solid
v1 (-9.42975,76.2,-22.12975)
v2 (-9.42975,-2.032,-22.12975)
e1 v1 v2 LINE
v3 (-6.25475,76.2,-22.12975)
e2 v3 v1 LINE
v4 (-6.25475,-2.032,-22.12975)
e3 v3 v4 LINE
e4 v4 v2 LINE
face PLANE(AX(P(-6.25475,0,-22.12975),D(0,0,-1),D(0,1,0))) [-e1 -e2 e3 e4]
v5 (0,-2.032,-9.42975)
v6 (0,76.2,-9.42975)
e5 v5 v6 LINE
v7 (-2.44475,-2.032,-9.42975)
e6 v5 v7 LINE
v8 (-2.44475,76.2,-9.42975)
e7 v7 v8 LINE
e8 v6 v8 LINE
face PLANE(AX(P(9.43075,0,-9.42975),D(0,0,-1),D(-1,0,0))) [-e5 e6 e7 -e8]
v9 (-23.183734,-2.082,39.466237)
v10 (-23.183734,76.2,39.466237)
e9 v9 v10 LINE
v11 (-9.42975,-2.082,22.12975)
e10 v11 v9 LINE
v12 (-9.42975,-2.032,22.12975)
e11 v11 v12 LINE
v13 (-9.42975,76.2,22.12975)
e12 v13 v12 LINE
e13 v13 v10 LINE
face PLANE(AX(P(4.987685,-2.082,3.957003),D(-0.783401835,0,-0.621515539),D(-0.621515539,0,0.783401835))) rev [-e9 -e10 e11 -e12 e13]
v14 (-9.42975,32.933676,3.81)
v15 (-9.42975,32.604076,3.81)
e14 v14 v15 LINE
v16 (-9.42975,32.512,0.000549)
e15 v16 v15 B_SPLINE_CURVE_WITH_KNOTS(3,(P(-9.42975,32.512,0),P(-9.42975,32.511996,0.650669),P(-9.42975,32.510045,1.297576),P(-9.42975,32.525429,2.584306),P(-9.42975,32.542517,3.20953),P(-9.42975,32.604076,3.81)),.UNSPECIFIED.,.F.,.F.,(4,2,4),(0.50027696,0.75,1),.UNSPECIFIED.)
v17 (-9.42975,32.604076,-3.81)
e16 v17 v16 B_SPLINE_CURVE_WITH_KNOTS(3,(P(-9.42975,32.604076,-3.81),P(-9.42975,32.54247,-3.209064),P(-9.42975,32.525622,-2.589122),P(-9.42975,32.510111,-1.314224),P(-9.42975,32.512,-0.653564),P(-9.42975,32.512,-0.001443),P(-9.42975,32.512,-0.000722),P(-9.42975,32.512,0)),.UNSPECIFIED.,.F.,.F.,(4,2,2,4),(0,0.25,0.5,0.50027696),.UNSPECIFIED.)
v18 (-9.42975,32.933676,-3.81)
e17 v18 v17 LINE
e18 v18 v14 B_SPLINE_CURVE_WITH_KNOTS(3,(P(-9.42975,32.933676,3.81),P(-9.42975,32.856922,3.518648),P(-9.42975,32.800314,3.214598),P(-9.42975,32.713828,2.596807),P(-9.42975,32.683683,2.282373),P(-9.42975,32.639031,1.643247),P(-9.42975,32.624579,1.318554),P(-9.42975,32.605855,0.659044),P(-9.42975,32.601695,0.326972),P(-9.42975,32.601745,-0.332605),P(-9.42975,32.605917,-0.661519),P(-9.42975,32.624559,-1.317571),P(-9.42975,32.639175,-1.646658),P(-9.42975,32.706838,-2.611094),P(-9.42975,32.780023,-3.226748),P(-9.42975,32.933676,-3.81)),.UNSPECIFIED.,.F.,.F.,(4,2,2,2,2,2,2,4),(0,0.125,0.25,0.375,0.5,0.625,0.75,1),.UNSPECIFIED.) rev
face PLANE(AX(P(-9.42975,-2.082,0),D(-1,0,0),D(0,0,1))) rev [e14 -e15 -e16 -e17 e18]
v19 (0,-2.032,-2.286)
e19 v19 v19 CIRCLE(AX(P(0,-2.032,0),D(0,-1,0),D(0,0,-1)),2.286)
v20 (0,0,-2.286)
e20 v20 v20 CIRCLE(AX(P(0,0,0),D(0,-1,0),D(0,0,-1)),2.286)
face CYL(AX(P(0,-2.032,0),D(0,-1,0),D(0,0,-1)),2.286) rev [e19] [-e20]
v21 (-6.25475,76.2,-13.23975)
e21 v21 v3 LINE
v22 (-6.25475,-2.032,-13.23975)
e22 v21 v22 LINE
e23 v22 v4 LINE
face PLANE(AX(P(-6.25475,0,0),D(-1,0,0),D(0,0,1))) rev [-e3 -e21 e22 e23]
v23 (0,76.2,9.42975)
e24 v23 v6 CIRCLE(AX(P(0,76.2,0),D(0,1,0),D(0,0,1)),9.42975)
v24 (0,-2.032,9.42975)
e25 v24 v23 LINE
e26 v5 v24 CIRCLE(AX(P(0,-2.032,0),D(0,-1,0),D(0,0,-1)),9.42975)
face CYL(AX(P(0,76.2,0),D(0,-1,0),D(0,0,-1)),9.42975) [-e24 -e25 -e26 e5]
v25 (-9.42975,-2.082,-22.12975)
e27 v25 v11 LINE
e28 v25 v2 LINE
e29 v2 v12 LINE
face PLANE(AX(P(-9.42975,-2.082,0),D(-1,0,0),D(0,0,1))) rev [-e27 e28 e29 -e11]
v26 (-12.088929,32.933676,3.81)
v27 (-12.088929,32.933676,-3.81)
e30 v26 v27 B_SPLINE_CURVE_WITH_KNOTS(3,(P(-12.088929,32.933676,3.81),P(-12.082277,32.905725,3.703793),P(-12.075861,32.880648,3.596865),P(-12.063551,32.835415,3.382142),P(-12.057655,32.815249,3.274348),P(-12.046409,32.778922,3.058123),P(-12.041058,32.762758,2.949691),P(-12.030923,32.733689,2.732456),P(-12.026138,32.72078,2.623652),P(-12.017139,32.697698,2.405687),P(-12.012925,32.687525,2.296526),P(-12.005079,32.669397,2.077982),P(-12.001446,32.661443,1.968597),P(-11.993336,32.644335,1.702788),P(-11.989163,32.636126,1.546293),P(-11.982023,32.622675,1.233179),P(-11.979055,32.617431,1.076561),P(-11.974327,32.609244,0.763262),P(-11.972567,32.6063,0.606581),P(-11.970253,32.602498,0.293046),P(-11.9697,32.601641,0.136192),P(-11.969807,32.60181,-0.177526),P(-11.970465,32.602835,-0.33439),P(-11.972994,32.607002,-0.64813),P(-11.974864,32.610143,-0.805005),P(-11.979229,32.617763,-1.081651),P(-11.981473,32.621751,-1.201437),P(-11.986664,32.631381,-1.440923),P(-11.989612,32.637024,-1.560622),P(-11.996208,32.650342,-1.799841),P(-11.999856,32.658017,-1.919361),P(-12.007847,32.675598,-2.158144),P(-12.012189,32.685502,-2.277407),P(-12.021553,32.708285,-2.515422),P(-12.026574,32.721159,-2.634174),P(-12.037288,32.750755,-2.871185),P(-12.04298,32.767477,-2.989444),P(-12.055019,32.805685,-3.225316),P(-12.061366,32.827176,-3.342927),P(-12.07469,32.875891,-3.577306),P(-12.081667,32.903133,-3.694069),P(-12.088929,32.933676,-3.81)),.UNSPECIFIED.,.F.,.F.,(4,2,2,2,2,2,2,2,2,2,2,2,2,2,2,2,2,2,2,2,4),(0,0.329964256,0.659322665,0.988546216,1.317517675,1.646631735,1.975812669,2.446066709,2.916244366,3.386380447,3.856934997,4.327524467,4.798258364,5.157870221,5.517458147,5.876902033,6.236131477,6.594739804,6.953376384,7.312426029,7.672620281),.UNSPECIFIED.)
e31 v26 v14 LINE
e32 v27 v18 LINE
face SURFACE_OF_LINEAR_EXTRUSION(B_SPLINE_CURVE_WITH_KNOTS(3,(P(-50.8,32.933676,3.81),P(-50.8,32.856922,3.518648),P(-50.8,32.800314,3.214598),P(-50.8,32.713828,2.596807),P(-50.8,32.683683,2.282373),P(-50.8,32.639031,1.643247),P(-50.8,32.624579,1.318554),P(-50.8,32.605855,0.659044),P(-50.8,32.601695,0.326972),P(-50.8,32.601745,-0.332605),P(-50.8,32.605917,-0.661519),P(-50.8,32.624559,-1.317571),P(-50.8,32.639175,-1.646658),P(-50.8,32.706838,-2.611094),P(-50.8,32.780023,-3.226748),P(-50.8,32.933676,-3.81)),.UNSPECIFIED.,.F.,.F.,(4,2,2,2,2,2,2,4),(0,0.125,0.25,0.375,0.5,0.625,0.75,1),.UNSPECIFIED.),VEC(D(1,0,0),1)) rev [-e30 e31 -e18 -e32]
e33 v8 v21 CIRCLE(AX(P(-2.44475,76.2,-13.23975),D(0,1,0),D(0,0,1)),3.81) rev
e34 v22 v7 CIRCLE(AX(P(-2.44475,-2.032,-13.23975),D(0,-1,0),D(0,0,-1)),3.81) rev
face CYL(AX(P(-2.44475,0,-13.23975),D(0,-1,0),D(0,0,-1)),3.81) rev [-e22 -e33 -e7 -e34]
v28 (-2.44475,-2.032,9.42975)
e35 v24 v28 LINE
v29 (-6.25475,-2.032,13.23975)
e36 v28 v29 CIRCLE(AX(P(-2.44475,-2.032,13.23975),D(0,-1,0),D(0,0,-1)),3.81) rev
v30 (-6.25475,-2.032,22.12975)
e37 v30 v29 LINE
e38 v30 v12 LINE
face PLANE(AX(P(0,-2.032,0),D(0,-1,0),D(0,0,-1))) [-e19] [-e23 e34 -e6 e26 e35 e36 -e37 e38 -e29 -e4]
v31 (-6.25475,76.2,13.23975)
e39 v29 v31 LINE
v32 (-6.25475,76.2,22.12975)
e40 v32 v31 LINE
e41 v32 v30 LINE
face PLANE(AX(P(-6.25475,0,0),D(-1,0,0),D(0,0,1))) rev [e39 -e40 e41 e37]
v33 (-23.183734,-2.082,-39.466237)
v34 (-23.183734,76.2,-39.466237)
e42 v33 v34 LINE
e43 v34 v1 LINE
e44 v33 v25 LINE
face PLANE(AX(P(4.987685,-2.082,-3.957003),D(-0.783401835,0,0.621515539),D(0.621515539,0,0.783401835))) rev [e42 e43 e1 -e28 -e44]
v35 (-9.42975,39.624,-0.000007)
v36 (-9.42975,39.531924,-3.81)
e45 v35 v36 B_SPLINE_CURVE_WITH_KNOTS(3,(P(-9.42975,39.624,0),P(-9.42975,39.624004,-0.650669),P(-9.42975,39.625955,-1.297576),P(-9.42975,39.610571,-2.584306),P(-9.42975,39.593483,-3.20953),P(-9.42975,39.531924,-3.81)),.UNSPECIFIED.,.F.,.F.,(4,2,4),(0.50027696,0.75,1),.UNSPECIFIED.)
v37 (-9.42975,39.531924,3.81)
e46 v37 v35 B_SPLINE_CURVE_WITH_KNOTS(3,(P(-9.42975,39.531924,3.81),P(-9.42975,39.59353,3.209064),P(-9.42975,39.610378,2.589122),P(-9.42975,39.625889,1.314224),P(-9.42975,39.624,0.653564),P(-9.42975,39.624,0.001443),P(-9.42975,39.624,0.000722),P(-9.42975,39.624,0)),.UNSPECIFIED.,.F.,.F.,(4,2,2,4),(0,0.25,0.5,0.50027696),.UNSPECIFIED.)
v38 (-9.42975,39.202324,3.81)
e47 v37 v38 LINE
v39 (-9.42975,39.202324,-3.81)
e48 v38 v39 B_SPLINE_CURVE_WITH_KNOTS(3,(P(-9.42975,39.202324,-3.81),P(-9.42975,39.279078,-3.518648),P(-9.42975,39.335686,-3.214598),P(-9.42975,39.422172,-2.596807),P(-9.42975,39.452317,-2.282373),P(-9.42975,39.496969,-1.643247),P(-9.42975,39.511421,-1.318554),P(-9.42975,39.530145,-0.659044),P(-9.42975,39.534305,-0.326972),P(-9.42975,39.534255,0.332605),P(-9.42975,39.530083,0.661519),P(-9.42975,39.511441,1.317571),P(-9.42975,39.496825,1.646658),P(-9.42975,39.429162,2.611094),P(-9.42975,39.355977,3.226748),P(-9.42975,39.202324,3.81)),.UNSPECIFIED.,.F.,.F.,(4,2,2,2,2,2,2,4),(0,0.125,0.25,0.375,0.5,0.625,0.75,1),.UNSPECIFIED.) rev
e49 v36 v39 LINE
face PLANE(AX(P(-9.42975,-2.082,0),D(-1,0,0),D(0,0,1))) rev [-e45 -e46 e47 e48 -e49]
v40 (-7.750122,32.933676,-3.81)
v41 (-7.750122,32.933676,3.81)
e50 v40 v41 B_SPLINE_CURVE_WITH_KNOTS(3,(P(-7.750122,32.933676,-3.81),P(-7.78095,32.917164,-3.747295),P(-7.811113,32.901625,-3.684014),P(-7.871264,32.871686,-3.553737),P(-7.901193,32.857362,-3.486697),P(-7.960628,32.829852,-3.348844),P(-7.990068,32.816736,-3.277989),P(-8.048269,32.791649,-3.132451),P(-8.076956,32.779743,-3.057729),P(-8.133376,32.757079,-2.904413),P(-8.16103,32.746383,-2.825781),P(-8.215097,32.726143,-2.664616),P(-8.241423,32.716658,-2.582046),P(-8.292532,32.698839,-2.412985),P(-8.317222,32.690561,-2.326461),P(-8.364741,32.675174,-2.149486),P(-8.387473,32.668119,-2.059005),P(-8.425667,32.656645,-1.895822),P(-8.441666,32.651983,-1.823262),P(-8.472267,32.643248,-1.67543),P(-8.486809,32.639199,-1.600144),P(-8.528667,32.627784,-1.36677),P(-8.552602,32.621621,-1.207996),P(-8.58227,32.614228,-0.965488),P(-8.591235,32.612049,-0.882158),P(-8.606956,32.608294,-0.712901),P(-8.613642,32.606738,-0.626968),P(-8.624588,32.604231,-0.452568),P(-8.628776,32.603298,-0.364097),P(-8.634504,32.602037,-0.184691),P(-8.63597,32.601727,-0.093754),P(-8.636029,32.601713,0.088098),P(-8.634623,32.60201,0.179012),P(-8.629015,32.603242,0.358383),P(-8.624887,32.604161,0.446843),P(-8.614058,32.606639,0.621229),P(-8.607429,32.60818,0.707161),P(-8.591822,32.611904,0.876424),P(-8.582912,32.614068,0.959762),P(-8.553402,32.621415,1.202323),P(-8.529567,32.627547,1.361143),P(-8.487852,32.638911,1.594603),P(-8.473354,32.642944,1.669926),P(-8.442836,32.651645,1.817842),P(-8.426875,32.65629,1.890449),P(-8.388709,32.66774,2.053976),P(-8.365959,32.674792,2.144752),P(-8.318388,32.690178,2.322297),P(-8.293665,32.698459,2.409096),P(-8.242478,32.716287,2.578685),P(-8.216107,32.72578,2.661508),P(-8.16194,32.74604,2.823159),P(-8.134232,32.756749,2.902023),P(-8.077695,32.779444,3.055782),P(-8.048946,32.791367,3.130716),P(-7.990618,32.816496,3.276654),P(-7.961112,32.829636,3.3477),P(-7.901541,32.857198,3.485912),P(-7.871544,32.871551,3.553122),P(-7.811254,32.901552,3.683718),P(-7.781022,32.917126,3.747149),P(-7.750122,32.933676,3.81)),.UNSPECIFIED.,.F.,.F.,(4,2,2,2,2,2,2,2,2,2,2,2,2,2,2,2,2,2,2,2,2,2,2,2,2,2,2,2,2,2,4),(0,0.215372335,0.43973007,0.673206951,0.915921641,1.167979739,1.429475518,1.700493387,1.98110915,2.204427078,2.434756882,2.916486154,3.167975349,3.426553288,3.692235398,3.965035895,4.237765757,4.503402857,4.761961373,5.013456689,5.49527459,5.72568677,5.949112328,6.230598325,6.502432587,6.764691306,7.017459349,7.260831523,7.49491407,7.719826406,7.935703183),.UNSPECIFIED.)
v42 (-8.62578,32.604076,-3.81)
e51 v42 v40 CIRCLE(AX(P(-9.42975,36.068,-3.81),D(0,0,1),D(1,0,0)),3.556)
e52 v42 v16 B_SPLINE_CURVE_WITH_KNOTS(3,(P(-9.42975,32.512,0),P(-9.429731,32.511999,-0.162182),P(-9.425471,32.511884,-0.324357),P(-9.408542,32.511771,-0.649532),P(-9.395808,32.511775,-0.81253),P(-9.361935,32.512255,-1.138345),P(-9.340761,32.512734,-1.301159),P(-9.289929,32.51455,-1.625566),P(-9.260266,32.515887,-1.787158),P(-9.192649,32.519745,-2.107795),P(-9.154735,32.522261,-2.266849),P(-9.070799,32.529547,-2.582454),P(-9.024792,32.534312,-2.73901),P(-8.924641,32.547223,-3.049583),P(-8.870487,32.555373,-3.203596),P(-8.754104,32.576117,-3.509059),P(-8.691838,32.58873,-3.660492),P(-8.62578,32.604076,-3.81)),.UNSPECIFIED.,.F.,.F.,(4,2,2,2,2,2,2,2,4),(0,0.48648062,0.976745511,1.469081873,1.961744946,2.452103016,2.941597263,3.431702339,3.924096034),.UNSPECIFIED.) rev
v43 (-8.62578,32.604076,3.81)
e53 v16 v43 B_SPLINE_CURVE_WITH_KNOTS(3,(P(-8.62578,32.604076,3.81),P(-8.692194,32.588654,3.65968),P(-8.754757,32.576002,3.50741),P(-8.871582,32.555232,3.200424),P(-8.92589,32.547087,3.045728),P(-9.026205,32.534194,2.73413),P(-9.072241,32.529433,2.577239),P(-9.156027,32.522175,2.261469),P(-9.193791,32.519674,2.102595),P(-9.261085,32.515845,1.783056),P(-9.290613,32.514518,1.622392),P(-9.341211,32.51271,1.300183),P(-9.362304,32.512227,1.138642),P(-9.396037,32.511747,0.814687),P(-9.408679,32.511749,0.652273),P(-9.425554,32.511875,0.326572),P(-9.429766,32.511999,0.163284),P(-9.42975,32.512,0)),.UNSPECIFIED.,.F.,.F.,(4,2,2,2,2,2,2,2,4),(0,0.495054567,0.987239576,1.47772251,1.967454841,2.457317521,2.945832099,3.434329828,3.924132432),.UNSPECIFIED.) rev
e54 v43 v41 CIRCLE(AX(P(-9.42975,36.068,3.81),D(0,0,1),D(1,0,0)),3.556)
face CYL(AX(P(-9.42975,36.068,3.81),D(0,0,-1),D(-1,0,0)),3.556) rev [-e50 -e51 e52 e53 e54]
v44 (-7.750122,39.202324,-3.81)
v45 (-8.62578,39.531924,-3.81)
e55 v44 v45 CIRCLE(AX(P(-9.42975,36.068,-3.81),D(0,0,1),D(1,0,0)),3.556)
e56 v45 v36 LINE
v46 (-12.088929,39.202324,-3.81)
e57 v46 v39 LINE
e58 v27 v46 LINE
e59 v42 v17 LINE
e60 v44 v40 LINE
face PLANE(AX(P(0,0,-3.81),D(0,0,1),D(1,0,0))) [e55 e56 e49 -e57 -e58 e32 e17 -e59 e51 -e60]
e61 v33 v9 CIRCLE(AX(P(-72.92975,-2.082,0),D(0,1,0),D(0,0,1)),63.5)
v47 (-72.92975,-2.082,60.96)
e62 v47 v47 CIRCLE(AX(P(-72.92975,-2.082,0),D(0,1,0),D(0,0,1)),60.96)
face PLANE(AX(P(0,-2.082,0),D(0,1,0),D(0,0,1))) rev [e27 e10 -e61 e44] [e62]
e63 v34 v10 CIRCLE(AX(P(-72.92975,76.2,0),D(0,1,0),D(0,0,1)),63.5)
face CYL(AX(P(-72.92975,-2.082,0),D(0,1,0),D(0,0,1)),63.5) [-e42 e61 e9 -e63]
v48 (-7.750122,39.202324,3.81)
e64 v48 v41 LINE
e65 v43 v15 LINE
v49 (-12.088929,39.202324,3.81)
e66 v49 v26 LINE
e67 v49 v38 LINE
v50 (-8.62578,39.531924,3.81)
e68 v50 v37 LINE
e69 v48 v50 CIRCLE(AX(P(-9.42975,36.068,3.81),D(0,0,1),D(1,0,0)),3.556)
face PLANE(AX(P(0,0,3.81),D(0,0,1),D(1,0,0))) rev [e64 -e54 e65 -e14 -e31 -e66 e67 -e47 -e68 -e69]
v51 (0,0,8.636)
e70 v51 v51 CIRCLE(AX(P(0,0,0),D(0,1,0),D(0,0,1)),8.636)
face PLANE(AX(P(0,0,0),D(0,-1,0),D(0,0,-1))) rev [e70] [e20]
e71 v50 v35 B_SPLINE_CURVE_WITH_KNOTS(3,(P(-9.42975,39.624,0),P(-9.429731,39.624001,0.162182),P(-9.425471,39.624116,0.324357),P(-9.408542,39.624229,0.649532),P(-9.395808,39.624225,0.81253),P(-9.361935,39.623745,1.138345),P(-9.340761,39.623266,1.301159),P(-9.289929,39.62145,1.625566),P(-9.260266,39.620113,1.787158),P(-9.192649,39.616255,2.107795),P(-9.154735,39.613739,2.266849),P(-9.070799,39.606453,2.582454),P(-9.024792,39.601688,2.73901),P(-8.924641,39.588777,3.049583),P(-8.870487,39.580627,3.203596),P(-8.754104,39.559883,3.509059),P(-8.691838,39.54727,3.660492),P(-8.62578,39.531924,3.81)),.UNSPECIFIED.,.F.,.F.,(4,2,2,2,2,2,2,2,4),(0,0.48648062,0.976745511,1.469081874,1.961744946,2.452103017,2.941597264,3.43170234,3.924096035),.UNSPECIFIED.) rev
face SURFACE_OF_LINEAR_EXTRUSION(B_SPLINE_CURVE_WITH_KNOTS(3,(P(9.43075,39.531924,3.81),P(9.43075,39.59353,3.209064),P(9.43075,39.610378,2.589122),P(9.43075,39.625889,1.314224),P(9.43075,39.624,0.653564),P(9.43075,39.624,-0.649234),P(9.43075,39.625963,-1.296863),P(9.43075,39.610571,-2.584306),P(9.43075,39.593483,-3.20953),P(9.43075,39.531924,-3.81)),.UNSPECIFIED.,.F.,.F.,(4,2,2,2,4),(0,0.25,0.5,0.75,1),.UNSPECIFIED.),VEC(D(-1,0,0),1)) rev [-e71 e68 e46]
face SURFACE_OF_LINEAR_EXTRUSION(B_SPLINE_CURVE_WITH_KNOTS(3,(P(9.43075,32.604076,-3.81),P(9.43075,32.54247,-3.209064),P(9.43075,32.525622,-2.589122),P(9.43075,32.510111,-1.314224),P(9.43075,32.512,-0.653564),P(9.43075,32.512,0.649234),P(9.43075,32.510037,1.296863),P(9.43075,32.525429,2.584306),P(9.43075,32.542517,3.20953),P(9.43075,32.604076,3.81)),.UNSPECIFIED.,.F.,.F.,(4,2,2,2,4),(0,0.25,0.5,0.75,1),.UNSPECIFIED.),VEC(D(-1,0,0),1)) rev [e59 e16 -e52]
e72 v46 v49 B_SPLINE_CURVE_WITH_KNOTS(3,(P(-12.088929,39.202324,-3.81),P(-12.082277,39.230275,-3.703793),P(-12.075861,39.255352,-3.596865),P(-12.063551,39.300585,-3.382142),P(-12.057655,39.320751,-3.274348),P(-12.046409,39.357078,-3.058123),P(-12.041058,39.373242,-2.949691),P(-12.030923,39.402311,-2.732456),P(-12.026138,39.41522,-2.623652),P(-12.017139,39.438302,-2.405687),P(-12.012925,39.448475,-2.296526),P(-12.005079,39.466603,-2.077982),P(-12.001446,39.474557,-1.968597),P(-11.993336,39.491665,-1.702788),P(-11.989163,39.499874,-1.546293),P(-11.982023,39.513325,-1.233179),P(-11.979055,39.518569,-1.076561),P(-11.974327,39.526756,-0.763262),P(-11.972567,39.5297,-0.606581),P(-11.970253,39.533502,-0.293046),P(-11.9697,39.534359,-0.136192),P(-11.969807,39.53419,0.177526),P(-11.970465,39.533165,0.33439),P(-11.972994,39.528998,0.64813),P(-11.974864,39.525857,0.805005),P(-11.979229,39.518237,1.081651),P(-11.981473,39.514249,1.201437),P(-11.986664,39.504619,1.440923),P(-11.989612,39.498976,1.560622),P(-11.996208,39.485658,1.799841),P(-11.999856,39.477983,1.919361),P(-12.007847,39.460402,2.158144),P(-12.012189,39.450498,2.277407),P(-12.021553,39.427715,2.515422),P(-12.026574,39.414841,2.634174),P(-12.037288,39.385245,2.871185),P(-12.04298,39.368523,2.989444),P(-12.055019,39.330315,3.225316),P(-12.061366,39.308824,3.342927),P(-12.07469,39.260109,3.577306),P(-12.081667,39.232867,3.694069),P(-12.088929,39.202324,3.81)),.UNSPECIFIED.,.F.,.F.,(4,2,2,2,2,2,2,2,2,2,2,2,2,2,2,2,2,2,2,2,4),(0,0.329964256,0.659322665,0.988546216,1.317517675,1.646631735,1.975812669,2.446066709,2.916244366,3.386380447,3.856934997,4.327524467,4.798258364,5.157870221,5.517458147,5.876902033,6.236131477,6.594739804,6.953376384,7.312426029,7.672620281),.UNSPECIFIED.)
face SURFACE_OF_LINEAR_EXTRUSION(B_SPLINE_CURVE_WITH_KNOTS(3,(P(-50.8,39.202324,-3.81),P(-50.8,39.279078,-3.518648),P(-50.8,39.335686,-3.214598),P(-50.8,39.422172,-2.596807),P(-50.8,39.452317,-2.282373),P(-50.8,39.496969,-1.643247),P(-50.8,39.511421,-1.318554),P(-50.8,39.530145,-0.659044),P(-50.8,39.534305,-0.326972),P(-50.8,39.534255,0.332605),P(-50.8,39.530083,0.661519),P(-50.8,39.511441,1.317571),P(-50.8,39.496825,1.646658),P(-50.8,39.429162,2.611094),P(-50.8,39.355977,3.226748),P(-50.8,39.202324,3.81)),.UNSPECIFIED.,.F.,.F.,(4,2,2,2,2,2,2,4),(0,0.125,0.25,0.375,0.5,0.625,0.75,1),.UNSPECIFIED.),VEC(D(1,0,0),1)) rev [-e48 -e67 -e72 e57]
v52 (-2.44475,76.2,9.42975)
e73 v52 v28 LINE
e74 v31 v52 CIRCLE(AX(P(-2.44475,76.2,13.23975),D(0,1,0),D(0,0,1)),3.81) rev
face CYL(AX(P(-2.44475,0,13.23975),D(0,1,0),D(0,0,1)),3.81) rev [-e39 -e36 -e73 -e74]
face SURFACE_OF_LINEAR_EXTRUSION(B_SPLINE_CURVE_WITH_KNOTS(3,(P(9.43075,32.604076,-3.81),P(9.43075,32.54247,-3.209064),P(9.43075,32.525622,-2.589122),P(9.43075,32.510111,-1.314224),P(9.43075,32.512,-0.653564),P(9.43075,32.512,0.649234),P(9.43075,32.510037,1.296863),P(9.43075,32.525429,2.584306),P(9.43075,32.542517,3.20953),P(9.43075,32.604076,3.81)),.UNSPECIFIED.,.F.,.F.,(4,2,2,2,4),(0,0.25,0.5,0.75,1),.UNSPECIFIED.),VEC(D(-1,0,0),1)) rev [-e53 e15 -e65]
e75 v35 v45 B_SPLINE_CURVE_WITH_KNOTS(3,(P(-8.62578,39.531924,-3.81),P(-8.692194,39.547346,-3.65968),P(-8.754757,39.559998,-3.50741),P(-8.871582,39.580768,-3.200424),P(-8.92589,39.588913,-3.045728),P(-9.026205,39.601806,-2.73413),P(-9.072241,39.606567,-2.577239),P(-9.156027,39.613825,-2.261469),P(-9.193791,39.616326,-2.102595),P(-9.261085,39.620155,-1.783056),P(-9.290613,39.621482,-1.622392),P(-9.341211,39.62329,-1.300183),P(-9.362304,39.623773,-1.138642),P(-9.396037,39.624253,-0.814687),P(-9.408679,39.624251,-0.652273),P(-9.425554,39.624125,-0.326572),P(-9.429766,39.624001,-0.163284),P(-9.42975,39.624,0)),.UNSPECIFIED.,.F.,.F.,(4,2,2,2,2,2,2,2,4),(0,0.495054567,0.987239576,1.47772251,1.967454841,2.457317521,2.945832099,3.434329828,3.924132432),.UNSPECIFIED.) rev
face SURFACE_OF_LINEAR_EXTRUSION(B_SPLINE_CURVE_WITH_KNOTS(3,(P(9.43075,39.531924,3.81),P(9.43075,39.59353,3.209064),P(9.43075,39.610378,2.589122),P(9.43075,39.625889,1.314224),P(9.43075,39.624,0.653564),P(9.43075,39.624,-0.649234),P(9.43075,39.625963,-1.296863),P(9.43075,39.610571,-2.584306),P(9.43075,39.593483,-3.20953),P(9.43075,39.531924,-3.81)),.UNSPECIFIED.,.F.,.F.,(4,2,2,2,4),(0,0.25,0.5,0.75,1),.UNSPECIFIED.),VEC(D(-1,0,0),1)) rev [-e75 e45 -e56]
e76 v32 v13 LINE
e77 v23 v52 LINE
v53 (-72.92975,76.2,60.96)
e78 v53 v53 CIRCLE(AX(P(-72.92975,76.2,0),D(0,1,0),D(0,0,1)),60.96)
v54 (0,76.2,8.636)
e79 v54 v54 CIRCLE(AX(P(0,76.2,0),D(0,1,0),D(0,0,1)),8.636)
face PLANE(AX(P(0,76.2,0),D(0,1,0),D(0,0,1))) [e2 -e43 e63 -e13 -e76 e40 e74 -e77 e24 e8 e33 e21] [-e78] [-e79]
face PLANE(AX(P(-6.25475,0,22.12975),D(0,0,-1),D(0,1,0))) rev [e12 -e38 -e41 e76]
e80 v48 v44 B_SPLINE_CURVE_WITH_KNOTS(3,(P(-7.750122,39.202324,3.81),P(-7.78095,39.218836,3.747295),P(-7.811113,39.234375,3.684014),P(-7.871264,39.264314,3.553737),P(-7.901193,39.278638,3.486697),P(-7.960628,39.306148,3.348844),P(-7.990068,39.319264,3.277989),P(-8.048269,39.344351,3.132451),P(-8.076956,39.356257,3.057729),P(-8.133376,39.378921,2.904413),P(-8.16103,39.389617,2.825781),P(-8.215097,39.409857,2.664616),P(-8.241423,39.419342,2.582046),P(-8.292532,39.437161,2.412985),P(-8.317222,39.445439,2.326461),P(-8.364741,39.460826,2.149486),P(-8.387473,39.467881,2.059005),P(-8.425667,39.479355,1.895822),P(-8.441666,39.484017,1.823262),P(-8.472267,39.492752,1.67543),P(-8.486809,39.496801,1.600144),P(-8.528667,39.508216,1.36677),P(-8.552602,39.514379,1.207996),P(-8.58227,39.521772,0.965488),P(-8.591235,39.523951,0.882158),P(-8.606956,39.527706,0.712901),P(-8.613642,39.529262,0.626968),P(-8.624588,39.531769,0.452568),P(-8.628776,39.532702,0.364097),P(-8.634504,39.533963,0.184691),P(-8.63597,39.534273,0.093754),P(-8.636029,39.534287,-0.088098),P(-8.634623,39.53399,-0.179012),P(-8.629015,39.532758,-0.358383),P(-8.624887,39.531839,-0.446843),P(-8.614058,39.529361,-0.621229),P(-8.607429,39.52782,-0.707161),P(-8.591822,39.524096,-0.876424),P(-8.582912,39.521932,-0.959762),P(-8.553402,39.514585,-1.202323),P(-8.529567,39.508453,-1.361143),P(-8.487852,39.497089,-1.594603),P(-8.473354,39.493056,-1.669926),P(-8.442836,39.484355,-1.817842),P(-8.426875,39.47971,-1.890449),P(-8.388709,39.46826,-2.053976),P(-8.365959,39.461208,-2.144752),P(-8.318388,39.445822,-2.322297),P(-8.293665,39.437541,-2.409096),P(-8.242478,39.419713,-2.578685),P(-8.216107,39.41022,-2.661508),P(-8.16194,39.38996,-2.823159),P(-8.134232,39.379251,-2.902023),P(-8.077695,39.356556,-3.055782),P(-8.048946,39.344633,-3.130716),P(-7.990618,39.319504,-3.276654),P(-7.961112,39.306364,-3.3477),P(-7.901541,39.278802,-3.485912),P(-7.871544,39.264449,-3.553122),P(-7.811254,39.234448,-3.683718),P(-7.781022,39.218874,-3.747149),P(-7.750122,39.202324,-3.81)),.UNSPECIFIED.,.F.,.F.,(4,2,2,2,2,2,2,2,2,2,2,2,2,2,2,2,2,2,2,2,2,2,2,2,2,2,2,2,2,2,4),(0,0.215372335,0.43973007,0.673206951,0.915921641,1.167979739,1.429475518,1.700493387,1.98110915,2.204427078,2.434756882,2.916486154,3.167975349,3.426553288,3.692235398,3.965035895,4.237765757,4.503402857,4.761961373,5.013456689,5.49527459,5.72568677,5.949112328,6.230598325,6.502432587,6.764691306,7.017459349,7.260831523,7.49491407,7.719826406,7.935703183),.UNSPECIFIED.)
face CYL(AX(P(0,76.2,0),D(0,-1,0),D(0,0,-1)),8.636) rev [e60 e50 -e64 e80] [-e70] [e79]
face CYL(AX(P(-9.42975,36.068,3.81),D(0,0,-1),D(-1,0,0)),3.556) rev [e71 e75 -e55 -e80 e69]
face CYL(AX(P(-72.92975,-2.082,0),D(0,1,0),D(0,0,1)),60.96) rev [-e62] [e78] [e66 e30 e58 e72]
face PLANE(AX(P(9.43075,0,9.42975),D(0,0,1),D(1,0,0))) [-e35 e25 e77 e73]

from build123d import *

# Parameters (mm, degrees)
SKETCH1_R                        = 9.42975
SKETCH1_R_2                      = 8.636
BOSS_EXTRUDE1_DEPTH              = 76.2
BOSS_EXTRUDE2_START              = 2.032
SKETCH2_R                        = 9.42975
BOSS_EXTRUDE2_DEPTH              = 2.032
F_10_0_1935_DIAMETER_HOLE1_D     = 4.572
F_10_0_1935_DIAMETER_HOLE1_DEPTH = 6.35
F_10_0_1935_DIAMETER_HOLE1_TIP   = 1.373567375
CUT_EXTRUDE1_DEPTH               = 3.81
CUT_EXTRUDE1_DEPTH_BACK          = 3.81
BOSS_EXTRUDE7_REACH              = 81.064
SKETCH7_W                        = 18.8595
SKETCH7_H                        = 78.232
SKETCH7_10_W                     = 12.7
SKETCH7_10_H                     = 78.232
BOSS_EXTRUDE8_DEPTH              = 3.175
FILLET1_R                        = 3.81
BOSS_EXTRUDE9_START              = -78.282
BOSS_EXTRUDE9_OUTLINE_R          = 60.96
BOSS_EXTRUDE9_DEPTH              = 78.282
CUT_EXTRUDE5_START               = -12.0889291
CUT_EXTRUDE5_DEPTH               = 2.6591791


# Read off the part's stored shape, not the designer's step: Boss-Extrude9, Cut-Extrude5
with BuildPart() as part:
    # Sketch1 → Boss-Extrude1 (new body)
    with BuildSketch(Plane(origin=(0, 0, 0), x_dir=(1, 0, 0), z_dir=(0, 1, 0))):
        with Locations(Location((0, 0, 0), (0, 0, 90))):
            Circle(SKETCH1_R)
        with Locations(Location((0, 0, 0), (0, 0, 90))):
            Circle(SKETCH1_R_2, mode=Mode.SUBTRACT)
    extrude(amount=BOSS_EXTRUDE1_DEPTH)

    # Sketch2 → Boss-Extrude2 (add)
    with BuildSketch(Plane.XZ.offset(BOSS_EXTRUDE2_START)):
        with Locations(Location((0, 0, 0), (0, 0, 270))):
            Circle(SKETCH2_R)
    extrude(amount=-BOSS_EXTRUDE2_DEPTH)

    # #10 (0.1935) Diameter Hole1
    with Locations(Plane(origin=(0, -2.032, 0), x_dir=(-1, 0, 0), z_dir=(0, -1, 0))):
        with Locations((0, 0)):
            Hole(F_10_0_1935_DIAMETER_HOLE1_D / 2, depth=F_10_0_1935_DIAMETER_HOLE1_DEPTH)
            with Locations((0, 0, -(F_10_0_1935_DIAMETER_HOLE1_DEPTH + F_10_0_1935_DIAMETER_HOLE1_TIP / 2))):  # 118° drill point
                Cone(0, F_10_0_1935_DIAMETER_HOLE1_D / 2, F_10_0_1935_DIAMETER_HOLE1_TIP, mode=Mode.SUBTRACT)

    # Sketch6 → Cut-Extrude1 (cut, two sides: drawn at the far end of the back side and taken through both)
    with BuildSketch(Plane.XY.offset(-CUT_EXTRUDE1_DEPTH_BACK)):
        with BuildLine():
            ThreePointArc((-9.42975, 32.512), (-5.87375, 36.068), (-9.42975, 39.624))
            Line((-9.42975, 39.624), (-9.42975, 32.512))
        make_face()
    extrude(amount=CUT_EXTRUDE1_DEPTH + CUT_EXTRUDE1_DEPTH_BACK, mode=Mode.SUBTRACT)

    # Sketch7 → Boss-Extrude7 (add, up to next)
    with BuildSketch(Plane.ZY.offset(9.42975), mode=Mode.PRIVATE) as boss_extrude7_sk1:
        with Locations((0, 37.084)):
            Rectangle(SKETCH7_W, SKETCH7_H)
        with BuildLine():
            add(Edge.make_bspline(
                [(3.81, 39.531923881), (3.209063744, 39.593530356), (2.589122456, 39.610377565), (1.314223657, 39.625889154), (0.653564006, 39.624), (-0.649234164, 39.624), (-1.296863086, 39.625963258), (-2.58430554, 39.610570946), (-3.209529815, 39.593482575), (-3.81, 39.531923881)],
                knots=[0, 0, 0, 0, 0.25, 0.25, 0.5, 0.5, 0.75, 0.75, 1, 1, 1, 1], degree=3))
            Line((3.81, 39.531923881), (3.81, 32.604076119))
            add(Edge.make_bspline(
                [(-3.81, 32.604076119), (-3.209063744, 32.542469644), (-2.589122456, 32.525622435), (-1.314223657, 32.510110846), (-0.653564006, 32.512), (0.649234164, 32.512), (1.296863086, 32.510036742), (2.58430554, 32.525429054), (3.209529815, 32.542517425), (3.81, 32.604076119)],
                knots=[0, 0, 0, 0, 0.25, 0.25, 0.5, 0.5, 0.75, 0.75, 1, 1, 1, 1], degree=3))
            Line((-3.81, 32.604076119), (-3.81, 39.531923881))
        make_face(mode=Mode.SUBTRACT)
    boss_extrude7_tool1 = extrude(boss_extrude7_sk1.sketch, amount=-BOSS_EXTRUDE7_REACH, mode=Mode.PRIVATE) - part.part
    add(boss_extrude7_tool1.solids().sort_by_distance((-9.42975, -1.227269, 0))[0])
    add(boss_extrude7_tool1.solids().sort_by_distance((-9.42975, -1.227269, 0))[1])

    # Sketch7<10> → Boss-Extrude8 (add)
    with BuildSketch(Plane.ZY.offset(9.42975)):
        with Locations((-15.77975, 37.084)):
            Rectangle(SKETCH7_10_W, SKETCH7_10_H)
        with Locations((15.77975, 37.084)):
            Rectangle(SKETCH7_10_W, SKETCH7_10_H)
    extrude(amount=-BOSS_EXTRUDE8_DEPTH)

    # Fillet1
    fillet1_edges = [part.edges().sort_by_distance(p)[0] for p in [
        (-6.25475, 37.084, 9.42975),
        (-6.25475, 37.084, -9.42975),
    ]]
    fillet(fillet1_edges, radius=FILLET1_R)

    # Boss-Extrude9 outline → Boss-Extrude9 (add)
    with BuildSketch(Plane(origin=(0, 76.2, 0), x_dir=(1, 0, 0), z_dir=(0, 1, 0)).offset(BOSS_EXTRUDE9_START)):
        with BuildLine():
            Line((-23.183733507, -39.466236748), (-9.42975, -22.12975))
            Line((-9.42975, -22.12975), (-9.42975, 22.12975))
            Line((-9.42975, 22.12975), (-23.183733507, 39.466236748))
            ThreePointArc((-23.183733507, 39.466236748), (-136.42975, 0), (-23.183733507, -39.466236748))
        make_face()
        with Locations((-72.92975, 0)):
            Circle(BOSS_EXTRUDE9_OUTLINE_R, mode=Mode.SUBTRACT)
    extrude(amount=BOSS_EXTRUDE9_DEPTH)

    # Cut-Extrude5 outline → Cut-Extrude5 (cut)
    with BuildSketch(Plane(origin=(0, 0, 0), x_dir=(0, 0, -1), z_dir=(1, 0, 0)).offset(CUT_EXTRUDE5_START)):
        with BuildLine():
            Line((3.81, 32.933676012), (3.81, 39.202323988))
            add(Edge.make_bspline(
                [(3.81, 39.202323988), (3.518648392, 39.279078334), (3.214598323, 39.335686025), (2.596807012, 39.422172204), (2.282372763, 39.452317221), (1.643247367, 39.496969319), (1.3185544, 39.511420765), (0.659044279, 39.530145261), (0.326972294, 39.534304508), (-0.332604892, 39.534255253), (-0.661519368, 39.5300831), (-1.317571239, 39.51144055), (-1.646658119, 39.496824503), (-2.611094156, 39.429162016), (-3.226748456, 39.355977132), (-3.81, 39.202323988)],
                knots=[0, 0, 0, 0, 0.125, 0.125, 0.25, 0.25, 0.375, 0.375, 0.5, 0.5, 0.625, 0.625, 0.75, 0.75, 1, 1, 1, 1], degree=3))
            Line((-3.81, 39.202323988), (-3.81, 32.933676012))
            add(Edge.make_bspline(
                [(-3.81, 32.933676012), (-3.518648392, 32.856921666), (-3.214598323, 32.800313975), (-2.596807012, 32.713827796), (-2.282372763, 32.683682779), (-1.643247367, 32.639030681), (-1.3185544, 32.624579235), (-0.659044279, 32.605854739), (-0.326972294, 32.601695492), (0.332604892, 32.601744747), (0.661519368, 32.6059169), (1.317571239, 32.62455945), (1.646658119, 32.639175497), (2.611094156, 32.706837984), (3.226748456, 32.780022868), (3.81, 32.933676012)],
                knots=[0, 0, 0, 0, 0.125, 0.125, 0.25, 0.25, 0.375, 0.375, 0.5, 0.5, 0.625, 0.625, 0.75, 0.75, 1, 1, 1, 1], degree=3))
        make_face()
    extrude(amount=CUT_EXTRUDE5_DEPTH, mode=Mode.SUBTRACT)


solid = part.part
